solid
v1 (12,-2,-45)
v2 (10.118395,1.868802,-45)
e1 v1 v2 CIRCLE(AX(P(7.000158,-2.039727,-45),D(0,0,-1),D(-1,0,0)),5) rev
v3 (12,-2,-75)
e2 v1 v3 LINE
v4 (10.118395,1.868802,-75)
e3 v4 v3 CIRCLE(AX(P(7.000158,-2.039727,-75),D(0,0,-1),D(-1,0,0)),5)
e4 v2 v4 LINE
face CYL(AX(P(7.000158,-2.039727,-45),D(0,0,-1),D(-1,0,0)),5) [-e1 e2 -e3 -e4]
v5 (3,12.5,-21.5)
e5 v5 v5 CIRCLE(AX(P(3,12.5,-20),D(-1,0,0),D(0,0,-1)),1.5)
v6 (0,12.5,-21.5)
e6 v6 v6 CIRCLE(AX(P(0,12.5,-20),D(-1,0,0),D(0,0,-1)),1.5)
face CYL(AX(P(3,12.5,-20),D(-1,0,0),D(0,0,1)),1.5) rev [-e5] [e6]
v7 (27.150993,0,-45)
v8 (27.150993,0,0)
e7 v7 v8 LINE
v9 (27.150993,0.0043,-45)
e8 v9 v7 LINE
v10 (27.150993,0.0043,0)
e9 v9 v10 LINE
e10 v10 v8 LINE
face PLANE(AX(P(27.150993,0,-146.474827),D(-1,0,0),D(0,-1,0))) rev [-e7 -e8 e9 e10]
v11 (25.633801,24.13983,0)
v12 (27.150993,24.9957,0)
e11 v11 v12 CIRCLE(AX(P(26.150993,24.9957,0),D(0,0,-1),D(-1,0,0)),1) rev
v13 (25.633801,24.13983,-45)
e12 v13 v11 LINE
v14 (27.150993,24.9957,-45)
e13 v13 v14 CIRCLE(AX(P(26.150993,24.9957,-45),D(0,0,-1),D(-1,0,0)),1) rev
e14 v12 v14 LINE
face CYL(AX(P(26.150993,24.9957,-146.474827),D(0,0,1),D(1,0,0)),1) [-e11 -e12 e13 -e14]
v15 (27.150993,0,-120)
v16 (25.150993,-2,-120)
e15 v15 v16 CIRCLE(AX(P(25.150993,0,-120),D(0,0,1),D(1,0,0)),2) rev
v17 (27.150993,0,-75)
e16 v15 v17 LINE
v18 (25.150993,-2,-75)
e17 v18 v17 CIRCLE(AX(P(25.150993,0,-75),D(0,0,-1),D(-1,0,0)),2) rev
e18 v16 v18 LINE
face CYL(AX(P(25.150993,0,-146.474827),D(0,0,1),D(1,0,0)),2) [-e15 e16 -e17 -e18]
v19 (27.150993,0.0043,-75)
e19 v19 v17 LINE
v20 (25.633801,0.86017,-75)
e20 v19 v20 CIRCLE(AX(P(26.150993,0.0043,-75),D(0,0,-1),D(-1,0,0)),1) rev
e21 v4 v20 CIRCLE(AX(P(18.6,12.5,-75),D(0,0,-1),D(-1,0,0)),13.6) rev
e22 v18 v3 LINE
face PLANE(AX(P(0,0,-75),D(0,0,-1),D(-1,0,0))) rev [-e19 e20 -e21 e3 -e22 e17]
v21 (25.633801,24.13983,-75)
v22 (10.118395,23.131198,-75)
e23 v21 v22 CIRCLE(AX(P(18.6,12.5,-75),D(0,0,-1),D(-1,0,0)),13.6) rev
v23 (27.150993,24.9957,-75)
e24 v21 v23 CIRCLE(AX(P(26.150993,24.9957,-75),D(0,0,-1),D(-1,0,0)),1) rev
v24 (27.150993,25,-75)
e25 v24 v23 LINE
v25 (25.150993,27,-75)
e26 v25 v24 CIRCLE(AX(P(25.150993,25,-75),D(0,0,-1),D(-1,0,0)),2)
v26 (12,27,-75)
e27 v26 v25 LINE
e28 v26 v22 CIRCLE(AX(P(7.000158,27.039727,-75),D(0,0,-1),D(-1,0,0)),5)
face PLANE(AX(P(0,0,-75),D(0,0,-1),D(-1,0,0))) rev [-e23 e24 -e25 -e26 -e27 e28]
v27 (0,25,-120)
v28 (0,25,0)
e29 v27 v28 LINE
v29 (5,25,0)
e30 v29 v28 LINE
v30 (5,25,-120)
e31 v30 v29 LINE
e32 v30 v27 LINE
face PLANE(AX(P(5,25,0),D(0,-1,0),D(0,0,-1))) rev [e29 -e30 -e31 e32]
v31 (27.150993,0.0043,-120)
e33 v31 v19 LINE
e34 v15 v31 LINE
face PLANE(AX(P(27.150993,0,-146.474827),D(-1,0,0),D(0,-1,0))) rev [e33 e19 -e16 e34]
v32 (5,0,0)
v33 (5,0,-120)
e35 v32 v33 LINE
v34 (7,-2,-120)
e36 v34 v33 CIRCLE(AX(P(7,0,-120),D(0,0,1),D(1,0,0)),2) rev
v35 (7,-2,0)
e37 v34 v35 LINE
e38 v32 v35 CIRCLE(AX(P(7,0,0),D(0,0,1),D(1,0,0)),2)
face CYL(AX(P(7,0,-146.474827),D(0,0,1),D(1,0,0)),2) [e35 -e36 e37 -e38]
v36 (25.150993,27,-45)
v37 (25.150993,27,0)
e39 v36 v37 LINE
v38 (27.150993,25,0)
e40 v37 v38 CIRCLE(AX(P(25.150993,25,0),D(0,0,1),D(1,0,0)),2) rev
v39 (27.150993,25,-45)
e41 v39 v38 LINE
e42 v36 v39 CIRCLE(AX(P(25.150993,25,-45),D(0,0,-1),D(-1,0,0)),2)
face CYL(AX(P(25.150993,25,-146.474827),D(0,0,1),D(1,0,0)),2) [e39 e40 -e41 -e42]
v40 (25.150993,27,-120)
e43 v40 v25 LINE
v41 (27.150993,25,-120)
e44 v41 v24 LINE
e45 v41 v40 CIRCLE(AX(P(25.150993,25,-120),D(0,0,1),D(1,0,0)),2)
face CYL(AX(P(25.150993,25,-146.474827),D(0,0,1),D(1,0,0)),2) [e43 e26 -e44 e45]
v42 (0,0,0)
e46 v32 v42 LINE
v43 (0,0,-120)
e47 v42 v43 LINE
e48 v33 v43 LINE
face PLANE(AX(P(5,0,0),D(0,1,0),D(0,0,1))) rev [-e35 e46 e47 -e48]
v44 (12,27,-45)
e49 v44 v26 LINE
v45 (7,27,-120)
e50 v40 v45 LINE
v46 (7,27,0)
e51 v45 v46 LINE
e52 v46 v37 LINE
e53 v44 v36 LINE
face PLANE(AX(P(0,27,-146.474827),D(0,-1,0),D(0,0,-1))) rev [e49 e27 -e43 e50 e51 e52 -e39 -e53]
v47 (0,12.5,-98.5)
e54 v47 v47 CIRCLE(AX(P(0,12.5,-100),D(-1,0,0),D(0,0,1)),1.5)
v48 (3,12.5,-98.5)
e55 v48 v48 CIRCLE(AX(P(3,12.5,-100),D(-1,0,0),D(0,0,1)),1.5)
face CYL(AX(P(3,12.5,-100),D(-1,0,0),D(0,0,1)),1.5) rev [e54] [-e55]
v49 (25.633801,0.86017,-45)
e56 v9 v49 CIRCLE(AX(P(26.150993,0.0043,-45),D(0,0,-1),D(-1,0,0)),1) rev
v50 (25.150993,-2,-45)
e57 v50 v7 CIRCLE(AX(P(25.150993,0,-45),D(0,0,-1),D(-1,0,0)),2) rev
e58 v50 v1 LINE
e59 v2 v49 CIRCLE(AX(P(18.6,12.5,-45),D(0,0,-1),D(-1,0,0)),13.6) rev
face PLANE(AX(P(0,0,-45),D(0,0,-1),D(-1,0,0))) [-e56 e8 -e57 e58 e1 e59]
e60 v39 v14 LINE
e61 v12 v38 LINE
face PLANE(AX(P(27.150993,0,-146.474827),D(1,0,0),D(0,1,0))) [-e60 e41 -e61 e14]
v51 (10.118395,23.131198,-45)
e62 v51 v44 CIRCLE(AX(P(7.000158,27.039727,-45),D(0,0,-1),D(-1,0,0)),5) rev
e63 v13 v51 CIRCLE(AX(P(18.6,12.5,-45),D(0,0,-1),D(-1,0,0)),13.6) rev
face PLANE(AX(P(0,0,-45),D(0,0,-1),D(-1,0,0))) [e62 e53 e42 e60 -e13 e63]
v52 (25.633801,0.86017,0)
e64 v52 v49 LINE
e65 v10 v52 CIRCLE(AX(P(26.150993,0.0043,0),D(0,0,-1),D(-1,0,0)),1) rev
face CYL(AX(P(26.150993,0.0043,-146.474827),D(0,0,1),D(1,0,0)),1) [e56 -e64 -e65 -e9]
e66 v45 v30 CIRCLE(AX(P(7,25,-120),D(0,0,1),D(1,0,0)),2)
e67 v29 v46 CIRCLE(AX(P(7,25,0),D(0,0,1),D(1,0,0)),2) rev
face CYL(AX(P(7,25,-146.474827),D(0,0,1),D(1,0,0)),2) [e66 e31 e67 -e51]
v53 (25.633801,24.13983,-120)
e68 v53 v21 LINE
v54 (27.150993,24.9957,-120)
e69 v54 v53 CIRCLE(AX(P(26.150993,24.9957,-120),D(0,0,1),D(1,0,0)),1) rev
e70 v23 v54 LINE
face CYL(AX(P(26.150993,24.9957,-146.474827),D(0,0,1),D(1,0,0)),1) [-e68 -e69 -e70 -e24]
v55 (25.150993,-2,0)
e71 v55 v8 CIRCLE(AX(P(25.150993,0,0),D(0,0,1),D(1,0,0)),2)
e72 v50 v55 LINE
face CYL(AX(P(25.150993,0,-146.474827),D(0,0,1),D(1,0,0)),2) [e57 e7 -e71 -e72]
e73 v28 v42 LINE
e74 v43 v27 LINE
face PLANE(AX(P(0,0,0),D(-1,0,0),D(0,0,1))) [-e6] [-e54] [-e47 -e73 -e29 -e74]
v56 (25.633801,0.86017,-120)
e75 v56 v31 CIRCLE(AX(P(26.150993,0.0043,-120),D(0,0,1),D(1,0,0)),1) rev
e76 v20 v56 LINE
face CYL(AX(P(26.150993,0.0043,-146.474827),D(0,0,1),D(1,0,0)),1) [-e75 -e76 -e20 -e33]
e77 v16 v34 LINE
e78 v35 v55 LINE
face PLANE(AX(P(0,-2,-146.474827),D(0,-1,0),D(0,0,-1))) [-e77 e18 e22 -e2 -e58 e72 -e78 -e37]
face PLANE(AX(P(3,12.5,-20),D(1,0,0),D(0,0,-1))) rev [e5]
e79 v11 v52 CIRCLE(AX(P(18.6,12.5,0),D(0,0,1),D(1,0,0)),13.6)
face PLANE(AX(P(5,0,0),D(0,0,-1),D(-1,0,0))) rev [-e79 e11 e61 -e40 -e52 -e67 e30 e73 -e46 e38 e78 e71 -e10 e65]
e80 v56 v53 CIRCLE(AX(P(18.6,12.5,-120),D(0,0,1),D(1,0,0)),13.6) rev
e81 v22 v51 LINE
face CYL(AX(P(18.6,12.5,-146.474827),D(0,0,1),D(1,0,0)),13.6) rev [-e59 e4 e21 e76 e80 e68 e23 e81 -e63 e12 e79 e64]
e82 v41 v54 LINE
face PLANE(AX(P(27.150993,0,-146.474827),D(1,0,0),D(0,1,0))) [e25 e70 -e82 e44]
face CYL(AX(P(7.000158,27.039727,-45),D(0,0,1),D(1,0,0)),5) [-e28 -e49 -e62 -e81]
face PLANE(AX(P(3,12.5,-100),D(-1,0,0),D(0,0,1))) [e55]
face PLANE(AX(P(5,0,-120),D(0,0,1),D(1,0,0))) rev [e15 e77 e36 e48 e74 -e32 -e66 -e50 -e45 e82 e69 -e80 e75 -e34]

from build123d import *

# Parameters (mm, degrees)
SKETCH1_W        = 120
SKETCH1_H        = 25
BASE_DEPTH       = 5
CLIP_DEPTH       = 120
SKETCH3_R        = 1.5
SCREWHOLES_DEPTH = 3
ROUNDEDCORNERS_R = 1
SKETCH4_W        = 15.150992531
SKETCH4_H        = 29
FINGERGAP_DEPTH  = 15
FINGERGROOVE_R   = 5


with BuildPart() as part:
    # Sketch1 → Base (new body)
    with BuildSketch(Plane(origin=(0, 0, 0), x_dir=(0, 0, -1), z_dir=(1, 0, 0))):
        with Locations((60, 12.5)):
            Rectangle(SKETCH1_W, SKETCH1_H)
    extrude(amount=BASE_DEPTH)

    # Sketch2 → Clip (add)
    with BuildSketch(Plane.XY):
        with BuildLine():
            Line((25.150992531, 27), (7, 27))
            ThreePointArc((7, 27), (5.585786438, 26.414213562), (5, 25))
            Line((5, 25), (5, 12.5))
            ThreePointArc((5, 12.5), (12.740541767, 24.773008971), (27.150992531, 23.075468156))
            Line((27.150992531, 23.075468156), (27.150992531, 25))
            ThreePointArc((27.150992531, 25), (26.565206094, 26.414213562), (25.150992531, 27))
        make_face()
        with BuildLine():
            ThreePointArc((27.150992531, 1.924531844), (12.740541767, 0.226991029), (5, 12.5))
            Line((5, 12.5), (5, 0))
            ThreePointArc((5, 0), (5.585786438, -1.414213562), (7, -2))
            Line((7, -2), (25.150992531, -2))
            ThreePointArc((25.150992531, -2), (26.565206094, -1.414213562), (27.150992531, 0))
            Line((27.150992531, 0), (27.150992531, 1.924531844))
        make_face()
    extrude(amount=-CLIP_DEPTH)

    # Sketch3 → ScrewHoles (cut)
    with BuildSketch(Plane.ZY):
        with Locations((-100, 12.5)):
            Circle(SKETCH3_R)
        with Locations(Location((-20, 12.5, 0), (0, 0, 180))):
            Circle(SKETCH3_R)
    extrude(amount=-SCREWHOLES_DEPTH, mode=Mode.SUBTRACT)

    # RoundedCorners
    roundedcorners_edges = [part.edges().sort_by_distance(p)[0] for p in [
        (27.150992531, 23.075468156, -60),
        (27.150992531, 1.924531844, -60),
    ]]
    fillet(roundedcorners_edges, radius=ROUNDEDCORNERS_R)

    # Sketch4 → FingerGap (cut, symmetric)
    with BuildSketch(Plane(origin=(0, 0, -60), x_dir=(-1, 0, 0), z_dir=(0, 0, -1))):
        with Locations((-19.575496265, 12.5)):
            Rectangle(SKETCH4_W, SKETCH4_H)
    extrude(amount=FINGERGAP_DEPTH, both=True, mode=Mode.SUBTRACT)

    # FingerGroove
    # the kernel refuses this fillet: 5 mm, written as the material it takes off along each edge
    with BuildSketch(Plane(origin=(12, 0.608826803, -75), x_dir=(-0.8309099585253181, 0.5564069022068779, 0), z_dir=(0, 0, 1))) as fingergroove_piece_1:
        with BuildLine():
            CenterArc((2.68094623, 4.982639626), FINGERGROOVE_R, 213.807673482, 51.416397028)
            Line((-1.473603562, 2.200605115), (0, 0))
            ThreePointArc((0, 0), (1.132325116, 0.047220218), (2.264650232, 0))
        make_face()
    extrude(amount=30, mode=Mode.SUBTRACT)
    with BuildSketch(Plane(origin=(12, 24.391173197, -75), x_dir=(-0.8309099585253178, -0.5564069022068784, 0), z_dir=(0, 0, 1))) as fingergroove_piece_2:
        with BuildLine():
            CenterArc((2.68094623, -4.982639626), FINGERGROOVE_R, 94.77592949, 51.416397028)
            Line((-1.473603562, -2.200605115), (0, 0))
            ThreePointArc((0, 0), (1.132325116, -0.047220218), (2.264650232, 0))
        make_face()
    extrude(amount=30, mode=Mode.SUBTRACT)


solid = part.part
